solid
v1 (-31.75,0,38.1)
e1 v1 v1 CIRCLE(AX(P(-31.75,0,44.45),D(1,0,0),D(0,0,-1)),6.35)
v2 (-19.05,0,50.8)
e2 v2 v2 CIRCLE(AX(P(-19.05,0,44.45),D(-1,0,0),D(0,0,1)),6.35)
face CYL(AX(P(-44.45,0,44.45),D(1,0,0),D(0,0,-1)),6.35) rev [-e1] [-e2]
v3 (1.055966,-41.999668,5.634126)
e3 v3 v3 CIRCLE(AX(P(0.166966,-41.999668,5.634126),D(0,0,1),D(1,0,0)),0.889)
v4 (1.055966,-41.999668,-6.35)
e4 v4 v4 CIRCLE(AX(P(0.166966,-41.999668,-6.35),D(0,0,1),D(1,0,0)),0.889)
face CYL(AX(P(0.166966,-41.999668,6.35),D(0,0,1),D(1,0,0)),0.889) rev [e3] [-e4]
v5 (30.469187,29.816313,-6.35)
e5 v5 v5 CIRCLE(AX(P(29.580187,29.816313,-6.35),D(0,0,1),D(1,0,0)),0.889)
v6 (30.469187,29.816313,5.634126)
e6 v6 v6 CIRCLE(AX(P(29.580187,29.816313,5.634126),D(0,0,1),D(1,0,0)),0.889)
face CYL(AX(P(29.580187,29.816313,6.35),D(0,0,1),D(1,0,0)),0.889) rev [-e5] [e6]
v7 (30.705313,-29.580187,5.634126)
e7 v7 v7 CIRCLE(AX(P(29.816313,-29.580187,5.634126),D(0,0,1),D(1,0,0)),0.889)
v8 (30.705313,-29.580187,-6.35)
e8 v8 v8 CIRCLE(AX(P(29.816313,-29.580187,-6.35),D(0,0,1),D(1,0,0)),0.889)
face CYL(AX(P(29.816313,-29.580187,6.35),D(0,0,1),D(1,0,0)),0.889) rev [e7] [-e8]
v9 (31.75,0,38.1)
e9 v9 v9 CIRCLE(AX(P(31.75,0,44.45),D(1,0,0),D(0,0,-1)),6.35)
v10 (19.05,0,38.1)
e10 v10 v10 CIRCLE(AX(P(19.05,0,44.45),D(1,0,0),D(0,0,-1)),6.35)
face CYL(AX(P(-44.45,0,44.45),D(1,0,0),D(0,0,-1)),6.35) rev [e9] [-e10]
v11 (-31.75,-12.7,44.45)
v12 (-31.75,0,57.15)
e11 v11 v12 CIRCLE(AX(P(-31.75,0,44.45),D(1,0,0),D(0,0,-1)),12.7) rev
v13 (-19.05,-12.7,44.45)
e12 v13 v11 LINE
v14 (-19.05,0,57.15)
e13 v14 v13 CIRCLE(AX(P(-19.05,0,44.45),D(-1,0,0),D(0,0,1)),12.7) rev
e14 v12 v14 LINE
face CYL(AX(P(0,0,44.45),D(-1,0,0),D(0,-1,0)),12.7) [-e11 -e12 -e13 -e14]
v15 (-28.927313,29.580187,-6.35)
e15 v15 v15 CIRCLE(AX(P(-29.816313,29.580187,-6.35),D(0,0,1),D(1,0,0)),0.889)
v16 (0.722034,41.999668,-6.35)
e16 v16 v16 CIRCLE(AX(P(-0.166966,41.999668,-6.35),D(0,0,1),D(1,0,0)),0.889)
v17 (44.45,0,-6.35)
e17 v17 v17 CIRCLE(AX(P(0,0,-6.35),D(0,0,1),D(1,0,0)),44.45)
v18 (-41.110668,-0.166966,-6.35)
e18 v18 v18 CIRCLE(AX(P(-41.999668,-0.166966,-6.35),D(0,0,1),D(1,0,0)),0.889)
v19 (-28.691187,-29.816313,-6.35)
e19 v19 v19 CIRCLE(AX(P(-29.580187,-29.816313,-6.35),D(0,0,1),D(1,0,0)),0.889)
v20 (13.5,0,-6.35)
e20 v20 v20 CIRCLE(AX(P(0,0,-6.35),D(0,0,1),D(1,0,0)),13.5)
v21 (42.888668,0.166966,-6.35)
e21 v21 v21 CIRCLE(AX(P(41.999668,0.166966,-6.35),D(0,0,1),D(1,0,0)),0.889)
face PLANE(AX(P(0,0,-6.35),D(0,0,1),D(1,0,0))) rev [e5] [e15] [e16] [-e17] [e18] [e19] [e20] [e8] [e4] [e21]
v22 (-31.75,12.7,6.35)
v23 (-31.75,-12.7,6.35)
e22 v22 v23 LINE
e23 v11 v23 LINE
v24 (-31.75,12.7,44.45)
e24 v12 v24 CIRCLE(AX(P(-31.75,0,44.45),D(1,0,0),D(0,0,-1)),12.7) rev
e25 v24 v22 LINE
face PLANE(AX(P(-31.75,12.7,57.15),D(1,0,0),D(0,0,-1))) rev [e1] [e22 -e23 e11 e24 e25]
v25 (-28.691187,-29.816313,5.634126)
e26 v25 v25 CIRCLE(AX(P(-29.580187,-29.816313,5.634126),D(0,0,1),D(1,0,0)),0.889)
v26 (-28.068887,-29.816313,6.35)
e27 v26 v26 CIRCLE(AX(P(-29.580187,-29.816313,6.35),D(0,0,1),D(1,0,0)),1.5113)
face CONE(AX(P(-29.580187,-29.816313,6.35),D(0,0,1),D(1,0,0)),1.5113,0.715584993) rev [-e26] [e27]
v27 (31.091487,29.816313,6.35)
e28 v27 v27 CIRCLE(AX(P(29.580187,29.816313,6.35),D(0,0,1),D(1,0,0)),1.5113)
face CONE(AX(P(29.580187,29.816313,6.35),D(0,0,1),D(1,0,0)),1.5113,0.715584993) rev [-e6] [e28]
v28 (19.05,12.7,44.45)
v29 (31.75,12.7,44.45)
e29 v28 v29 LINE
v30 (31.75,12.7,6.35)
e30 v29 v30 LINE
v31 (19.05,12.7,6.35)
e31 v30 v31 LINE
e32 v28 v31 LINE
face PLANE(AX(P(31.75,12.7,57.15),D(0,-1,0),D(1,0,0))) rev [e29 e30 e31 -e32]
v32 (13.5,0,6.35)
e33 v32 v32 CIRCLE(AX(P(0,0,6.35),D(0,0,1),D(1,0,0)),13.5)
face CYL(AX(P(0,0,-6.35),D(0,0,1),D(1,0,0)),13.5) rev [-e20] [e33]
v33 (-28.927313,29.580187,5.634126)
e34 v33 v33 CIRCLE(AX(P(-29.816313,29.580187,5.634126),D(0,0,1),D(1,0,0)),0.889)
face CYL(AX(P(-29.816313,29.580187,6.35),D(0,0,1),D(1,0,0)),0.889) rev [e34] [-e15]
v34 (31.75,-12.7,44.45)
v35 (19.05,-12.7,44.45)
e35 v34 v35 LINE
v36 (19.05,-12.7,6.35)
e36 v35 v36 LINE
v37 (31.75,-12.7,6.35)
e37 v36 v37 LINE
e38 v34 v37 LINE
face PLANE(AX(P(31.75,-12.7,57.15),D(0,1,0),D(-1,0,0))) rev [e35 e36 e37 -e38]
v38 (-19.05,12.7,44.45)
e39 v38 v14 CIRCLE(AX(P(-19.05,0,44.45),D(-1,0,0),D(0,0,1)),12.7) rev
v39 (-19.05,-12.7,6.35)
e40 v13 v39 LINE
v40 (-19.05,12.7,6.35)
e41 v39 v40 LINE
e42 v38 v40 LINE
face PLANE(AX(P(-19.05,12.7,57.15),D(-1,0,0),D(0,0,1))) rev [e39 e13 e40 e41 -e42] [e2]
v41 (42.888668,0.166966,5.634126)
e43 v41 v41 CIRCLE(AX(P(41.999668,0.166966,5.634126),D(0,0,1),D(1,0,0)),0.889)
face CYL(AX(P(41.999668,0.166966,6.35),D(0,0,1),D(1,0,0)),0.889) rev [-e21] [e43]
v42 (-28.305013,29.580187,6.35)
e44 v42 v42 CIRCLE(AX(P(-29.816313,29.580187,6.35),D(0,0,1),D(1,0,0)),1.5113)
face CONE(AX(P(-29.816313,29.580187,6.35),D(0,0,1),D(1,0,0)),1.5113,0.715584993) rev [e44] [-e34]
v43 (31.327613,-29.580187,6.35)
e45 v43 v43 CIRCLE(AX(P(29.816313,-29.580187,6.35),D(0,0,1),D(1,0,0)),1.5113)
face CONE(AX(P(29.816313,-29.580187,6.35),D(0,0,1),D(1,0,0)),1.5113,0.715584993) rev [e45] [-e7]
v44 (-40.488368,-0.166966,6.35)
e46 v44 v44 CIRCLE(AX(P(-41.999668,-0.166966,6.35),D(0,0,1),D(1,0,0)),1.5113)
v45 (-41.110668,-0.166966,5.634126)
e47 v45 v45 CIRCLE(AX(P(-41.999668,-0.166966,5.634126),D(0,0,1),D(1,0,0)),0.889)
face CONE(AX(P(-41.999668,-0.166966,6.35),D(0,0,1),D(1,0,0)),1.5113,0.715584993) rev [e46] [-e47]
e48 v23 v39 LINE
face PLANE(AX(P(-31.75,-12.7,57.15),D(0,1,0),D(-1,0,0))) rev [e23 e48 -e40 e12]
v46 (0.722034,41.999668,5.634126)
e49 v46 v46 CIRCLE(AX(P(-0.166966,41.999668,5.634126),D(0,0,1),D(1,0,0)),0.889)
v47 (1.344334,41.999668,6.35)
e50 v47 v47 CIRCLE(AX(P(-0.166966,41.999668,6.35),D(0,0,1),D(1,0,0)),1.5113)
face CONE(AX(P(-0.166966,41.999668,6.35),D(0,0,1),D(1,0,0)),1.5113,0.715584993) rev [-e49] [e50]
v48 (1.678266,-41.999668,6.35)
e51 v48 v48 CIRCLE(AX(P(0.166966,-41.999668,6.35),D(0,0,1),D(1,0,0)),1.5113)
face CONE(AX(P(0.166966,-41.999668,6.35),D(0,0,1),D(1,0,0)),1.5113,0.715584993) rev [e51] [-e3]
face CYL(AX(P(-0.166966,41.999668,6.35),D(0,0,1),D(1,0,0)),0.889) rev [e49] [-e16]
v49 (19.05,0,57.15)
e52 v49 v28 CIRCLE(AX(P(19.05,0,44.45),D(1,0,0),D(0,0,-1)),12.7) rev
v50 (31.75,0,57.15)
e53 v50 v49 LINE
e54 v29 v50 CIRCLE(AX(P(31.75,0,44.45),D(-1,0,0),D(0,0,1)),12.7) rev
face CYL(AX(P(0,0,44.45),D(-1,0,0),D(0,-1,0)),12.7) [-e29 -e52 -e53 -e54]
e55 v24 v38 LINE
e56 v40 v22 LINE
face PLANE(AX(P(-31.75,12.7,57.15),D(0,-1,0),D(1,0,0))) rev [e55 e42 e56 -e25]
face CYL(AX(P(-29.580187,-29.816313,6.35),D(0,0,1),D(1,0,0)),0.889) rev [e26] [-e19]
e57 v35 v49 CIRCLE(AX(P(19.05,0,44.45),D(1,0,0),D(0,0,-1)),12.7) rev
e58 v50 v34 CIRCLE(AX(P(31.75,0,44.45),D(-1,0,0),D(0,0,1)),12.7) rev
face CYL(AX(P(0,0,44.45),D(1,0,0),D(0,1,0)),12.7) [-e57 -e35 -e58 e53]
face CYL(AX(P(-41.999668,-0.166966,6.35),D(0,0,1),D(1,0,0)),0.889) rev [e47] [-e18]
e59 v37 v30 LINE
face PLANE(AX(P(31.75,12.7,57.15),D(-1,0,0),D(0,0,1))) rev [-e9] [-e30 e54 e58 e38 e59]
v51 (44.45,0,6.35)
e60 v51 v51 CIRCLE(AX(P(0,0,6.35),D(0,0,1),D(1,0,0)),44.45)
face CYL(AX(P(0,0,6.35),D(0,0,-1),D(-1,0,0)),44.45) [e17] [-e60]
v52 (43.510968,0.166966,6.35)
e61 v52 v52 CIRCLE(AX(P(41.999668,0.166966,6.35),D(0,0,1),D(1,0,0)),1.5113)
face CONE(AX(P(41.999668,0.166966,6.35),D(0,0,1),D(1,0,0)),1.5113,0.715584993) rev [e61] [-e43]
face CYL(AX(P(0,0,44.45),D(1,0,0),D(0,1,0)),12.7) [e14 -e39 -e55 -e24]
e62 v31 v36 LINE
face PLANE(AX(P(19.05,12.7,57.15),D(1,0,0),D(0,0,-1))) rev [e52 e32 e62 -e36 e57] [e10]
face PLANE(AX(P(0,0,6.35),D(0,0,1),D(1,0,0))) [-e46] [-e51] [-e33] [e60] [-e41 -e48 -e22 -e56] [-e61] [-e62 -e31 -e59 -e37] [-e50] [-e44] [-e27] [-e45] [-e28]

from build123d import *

# Parameters (mm, degrees)
SKETCH1_R                                      = 44.45
BOSS_EXTRUDE1_DEPTH                            = 6.35
SKETCH2_R                                      = 13.5
CUT_EXTRUDE1_DEPTH                             = 65.131856359
CSK_FOR_0_FLAT_HEAD_MACHINE_SCREW1_D           = 1.778
CSK_FOR_0_FLAT_HEAD_MACHINE_SCREW1_CSINK_D     = 3.0226
CSK_FOR_0_FLAT_HEAD_MACHINE_SCREW1_CSINK_ANGLE = 82
CIRPATTERN1_COUNT                              = 8
SKETCH6_W                                      = 12.7
SKETCH6_H                                      = 25.4
BOSS_EXTRUDE2_DEPTH                            = 50.8
FILLET1_R                                      = 12.7
SKETCH7_R                                      = 6.35
CUT_EXTRUDE2_DEPTH                             = 106.111203019


with BuildPart() as part:
    # Sketch1 → Boss-Extrude1 (new, symmetric)
    with BuildSketch(Plane.XY):
        Circle(SKETCH1_R)
    extrude(amount=BOSS_EXTRUDE1_DEPTH, both=True)

    # Sketch2 → Cut-Extrude1 (cut, through all)
    with BuildSketch(Plane.XY.offset(6.35)):
        Circle(SKETCH2_R)
    extrude(amount=-CUT_EXTRUDE1_DEPTH, mode=Mode.SUBTRACT)

    # CSK for #0 Flat Head Machine Screw1 (through all)
    with Locations(Plane(origin=(-0.166965968, 41.999668122, 6.35), x_dir=(1, 0, 0), z_dir=(0, 0, 1))):
        with Locations((0, 0)):
            csk_for_0_flat_head_machine_screw1 = CounterSinkHole(CSK_FOR_0_FLAT_HEAD_MACHINE_SCREW1_D / 2, CSK_FOR_0_FLAT_HEAD_MACHINE_SCREW1_CSINK_D / 2, counter_sink_angle=CSK_FOR_0_FLAT_HEAD_MACHINE_SCREW1_CSINK_ANGLE)

    # CirPattern1: CSK for #0 Flat Head Machine Screw1 ×8 about axis
    cirpattern1_axis = Axis((0, 0, 0), (0, 0, 1))
    for i in range(1, CIRPATTERN1_COUNT):
        add(csk_for_0_flat_head_machine_screw1.rotate(cirpattern1_axis, i * 360 / CIRPATTERN1_COUNT), mode=Mode.SUBTRACT)

    # Sketch6 → Boss-Extrude2 (add)
    with BuildSketch(Plane.XY.offset(6.35)):
        with Locations((-25.4, 0)):
            Rectangle(SKETCH6_W, SKETCH6_H)
        with Locations((25.4, 0)):
            Rectangle(SKETCH6_W, SKETCH6_H)
    extrude(amount=BOSS_EXTRUDE2_DEPTH)

    # Fillet1
    fillet1_edges = [part.edges().sort_by_distance(p)[0] for p in [
        (-25.4, 12.7, 57.15),
        (-25.4, -12.7, 57.15),
        (25.4, -12.7, 57.15),
        (25.4, 12.7, 57.15),
    ]]
    fillet(fillet1_edges, radius=FILLET1_R - 0.0001)  # a hair under: the kernel refuses the full size

    # Sketch7 → Cut-Extrude2 (cut, through all)
    with BuildSketch(Plane(origin=(31.75, 0, 0), x_dir=(0, 0, -1), z_dir=(1, 0, 0))):
        with Locations((-44.45, 0)):
            Circle(SKETCH7_R)
    extrude(amount=-CUT_EXTRUDE2_DEPTH, mode=Mode.SUBTRACT)


solid = part.part
